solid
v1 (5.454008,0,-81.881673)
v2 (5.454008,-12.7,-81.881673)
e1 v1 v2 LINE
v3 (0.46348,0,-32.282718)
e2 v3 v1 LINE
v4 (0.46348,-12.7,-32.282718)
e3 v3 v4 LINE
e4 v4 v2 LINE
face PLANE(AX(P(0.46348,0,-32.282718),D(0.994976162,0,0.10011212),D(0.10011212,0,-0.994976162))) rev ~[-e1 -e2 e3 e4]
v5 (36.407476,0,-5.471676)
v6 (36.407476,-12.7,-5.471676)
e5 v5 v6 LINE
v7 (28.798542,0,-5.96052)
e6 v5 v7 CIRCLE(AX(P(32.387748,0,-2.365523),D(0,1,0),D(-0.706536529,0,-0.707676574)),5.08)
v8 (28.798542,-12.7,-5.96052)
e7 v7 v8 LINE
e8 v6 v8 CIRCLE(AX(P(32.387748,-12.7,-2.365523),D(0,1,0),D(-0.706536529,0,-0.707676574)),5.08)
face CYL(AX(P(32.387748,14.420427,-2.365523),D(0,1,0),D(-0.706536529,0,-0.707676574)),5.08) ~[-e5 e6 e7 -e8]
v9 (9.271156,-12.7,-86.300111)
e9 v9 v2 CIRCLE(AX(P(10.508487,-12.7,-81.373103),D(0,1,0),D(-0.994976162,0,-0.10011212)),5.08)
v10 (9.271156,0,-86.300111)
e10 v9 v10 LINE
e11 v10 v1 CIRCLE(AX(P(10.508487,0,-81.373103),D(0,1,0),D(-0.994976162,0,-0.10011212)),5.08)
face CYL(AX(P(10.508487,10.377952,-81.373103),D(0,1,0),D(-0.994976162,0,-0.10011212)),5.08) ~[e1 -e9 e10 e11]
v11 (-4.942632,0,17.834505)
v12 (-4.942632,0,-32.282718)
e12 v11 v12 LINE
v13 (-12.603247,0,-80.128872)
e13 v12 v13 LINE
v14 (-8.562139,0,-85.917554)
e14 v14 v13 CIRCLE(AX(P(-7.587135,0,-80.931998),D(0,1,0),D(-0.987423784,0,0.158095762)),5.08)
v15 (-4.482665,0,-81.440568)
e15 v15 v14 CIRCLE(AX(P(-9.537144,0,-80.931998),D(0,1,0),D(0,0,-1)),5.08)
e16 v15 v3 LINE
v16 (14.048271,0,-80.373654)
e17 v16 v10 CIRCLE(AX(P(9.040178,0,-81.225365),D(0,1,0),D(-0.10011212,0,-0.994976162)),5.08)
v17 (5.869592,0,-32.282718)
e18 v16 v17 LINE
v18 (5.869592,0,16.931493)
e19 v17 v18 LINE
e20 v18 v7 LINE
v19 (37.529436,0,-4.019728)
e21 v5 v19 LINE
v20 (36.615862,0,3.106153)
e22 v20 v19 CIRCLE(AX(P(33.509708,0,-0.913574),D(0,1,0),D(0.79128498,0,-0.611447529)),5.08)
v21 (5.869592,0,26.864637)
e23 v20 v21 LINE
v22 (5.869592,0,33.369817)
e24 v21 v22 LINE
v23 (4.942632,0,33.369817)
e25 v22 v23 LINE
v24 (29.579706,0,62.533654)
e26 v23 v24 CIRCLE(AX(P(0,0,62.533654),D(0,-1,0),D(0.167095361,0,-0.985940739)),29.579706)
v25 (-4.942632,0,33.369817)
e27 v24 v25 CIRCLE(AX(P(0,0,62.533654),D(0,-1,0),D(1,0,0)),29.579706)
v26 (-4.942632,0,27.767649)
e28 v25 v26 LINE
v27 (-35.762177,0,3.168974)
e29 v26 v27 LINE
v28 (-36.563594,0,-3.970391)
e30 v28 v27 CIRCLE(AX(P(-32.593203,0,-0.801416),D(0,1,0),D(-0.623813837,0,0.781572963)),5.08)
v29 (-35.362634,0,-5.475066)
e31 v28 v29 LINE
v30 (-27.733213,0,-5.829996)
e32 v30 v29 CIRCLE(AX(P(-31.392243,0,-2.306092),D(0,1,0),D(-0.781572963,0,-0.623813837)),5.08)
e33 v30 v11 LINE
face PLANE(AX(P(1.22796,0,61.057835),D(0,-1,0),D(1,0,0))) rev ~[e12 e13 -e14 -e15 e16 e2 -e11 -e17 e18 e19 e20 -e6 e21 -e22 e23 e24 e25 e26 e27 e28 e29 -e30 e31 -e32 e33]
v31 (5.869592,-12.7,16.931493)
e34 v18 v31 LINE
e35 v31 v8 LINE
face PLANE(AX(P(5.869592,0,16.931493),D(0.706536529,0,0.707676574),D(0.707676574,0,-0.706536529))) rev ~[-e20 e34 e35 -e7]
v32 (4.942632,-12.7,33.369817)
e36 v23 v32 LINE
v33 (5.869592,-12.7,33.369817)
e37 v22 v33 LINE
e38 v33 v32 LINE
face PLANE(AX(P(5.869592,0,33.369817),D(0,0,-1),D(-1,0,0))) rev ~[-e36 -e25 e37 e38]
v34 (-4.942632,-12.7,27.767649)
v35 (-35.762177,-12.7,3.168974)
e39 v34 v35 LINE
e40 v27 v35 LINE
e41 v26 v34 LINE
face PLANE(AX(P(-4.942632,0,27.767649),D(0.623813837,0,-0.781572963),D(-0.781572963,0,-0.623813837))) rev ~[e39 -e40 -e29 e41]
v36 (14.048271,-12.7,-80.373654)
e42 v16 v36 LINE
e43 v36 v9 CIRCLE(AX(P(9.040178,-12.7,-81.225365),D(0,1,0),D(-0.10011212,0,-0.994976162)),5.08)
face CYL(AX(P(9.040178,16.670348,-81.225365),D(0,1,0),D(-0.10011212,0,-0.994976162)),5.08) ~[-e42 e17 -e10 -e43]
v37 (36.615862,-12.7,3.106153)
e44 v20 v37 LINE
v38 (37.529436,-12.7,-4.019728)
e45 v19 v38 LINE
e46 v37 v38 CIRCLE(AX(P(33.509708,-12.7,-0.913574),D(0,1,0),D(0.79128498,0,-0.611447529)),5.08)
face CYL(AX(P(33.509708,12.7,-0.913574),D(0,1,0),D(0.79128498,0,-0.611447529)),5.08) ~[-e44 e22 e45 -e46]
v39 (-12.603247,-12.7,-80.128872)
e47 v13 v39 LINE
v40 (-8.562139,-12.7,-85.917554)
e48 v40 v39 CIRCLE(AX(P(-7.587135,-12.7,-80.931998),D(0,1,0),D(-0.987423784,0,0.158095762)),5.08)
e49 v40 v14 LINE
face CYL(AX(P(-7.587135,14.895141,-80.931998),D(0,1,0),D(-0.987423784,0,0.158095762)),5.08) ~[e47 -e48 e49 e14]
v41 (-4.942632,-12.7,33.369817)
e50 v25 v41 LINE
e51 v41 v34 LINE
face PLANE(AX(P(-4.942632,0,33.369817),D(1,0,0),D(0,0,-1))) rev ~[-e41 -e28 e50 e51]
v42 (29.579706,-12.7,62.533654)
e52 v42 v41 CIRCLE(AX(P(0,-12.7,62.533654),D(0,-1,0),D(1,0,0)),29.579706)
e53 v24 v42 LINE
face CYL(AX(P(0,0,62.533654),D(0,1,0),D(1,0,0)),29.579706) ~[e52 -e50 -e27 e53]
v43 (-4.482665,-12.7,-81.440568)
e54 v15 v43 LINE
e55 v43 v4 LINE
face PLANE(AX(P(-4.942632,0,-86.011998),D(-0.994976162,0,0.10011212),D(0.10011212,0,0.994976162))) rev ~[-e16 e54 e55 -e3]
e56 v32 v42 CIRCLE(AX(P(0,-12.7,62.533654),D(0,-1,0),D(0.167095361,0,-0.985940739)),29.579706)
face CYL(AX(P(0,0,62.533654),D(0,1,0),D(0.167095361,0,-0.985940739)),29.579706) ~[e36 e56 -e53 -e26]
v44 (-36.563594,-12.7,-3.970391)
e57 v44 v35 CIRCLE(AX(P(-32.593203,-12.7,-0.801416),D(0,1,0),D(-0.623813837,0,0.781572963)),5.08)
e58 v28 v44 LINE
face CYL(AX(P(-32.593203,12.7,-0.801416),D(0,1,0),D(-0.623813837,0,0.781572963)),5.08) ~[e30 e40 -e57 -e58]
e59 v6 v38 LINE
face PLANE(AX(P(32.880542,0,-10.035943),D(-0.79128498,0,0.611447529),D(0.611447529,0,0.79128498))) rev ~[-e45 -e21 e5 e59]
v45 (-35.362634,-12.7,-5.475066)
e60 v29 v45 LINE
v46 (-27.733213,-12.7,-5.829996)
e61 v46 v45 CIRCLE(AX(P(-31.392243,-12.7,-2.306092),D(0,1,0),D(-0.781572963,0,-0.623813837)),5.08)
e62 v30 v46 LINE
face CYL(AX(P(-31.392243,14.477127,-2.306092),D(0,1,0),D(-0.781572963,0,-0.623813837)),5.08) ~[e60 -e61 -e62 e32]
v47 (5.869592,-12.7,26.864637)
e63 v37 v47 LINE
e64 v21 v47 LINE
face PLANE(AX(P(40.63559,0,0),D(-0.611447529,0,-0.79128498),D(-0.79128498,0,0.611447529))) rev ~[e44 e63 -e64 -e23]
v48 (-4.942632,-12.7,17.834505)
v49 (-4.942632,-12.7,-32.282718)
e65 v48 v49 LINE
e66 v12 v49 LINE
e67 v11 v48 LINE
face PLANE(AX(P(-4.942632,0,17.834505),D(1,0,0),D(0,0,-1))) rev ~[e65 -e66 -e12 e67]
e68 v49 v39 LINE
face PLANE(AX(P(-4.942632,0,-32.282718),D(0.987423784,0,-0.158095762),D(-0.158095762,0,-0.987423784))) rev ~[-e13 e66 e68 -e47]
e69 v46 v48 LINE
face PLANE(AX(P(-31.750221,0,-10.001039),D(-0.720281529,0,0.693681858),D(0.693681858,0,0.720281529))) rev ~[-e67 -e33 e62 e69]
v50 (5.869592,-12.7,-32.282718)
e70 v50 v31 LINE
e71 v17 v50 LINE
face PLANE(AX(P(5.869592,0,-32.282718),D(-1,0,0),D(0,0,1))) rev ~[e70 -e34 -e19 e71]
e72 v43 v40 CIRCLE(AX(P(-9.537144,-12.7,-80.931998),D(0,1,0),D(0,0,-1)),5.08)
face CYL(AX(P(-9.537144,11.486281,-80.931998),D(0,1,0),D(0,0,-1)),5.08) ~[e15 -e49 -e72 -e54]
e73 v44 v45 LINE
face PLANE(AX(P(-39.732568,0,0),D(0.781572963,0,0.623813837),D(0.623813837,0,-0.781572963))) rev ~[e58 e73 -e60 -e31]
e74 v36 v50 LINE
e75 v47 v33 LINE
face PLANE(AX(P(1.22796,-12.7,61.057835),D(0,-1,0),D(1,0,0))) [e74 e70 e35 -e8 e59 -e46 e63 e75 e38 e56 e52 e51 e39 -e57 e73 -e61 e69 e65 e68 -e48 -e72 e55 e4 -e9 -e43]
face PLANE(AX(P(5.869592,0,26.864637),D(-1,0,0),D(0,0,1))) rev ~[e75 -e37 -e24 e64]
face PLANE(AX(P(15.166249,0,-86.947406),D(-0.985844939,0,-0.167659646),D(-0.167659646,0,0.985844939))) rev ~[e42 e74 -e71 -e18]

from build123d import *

# Parameters (mm, degrees)
F1_DEPTH     = 12.7
F2_T1_DEPTH  = 38.1
F2_T3_DEPTH  = 41.6542533238
F2_T5_DEPTH  = 41.5408544992
F2_T7_DEPTH  = 35.6725625774
F2_T9_DEPTH  = 33.4559034625
F2_T11_DEPTH = 42.4902813585
F2_T13_DEPTH = 46.0406969882


# Not quite as in the source:
# - a fillet or chamfer that OpenCascade refuses, or shapes differently, is made with other operations: its cross-section is extruded or revolved along the edge and cut away or added


with BuildPart() as f1:
    # F0 (on Front) → F1 (new body)
    with BuildSketch(Plane.XZ):
        with BuildLine():
            ThreePointArc((4.9426316758, 33.3698169468), (22.5960240749, 43.4449478875), (29.579706142, 62.5336542726))
            ThreePointArc((29.579706142, 62.5336542726), (-19.0887063851, 85.1296783474), (-4.9426316758, 33.3698169468))
            Line((-4.9426316758, 33.3698169468), (4.9426316758, 33.3698169468))
        make_face()
        with BuildLine():
            Line((4.9426316758, 33.3698169468), (-4.9426316758, 33.3698169468))
            ThreePointArc((-4.9426316758, 33.3698169468), (0, 32.9539481306), (4.9426316758, 33.3698169468))
        make_face()
        with BuildLine():
            ThreePointArc((4.9426316758, 33.3698169468), (0, 32.9539481306), (-4.9426316758, 33.3698169468))
            Line((-4.9426316758, 33.3698169468), (-4.9426316758, 27.7676489204))
            Line((-4.9426316758, 27.7676489204), (-4.9426316758, 17.8345050663))
            Line((-4.9426316758, 17.8345050663), (-4.9426316758, -32.282717526))
            Line((-4.9426316758, -32.282717526), (0.4634799664, -32.282717526))
            Line((0.4634799664, -32.282717526), (5.8695916086, -32.282717526))
            Line((5.8695916086, -32.282717526), (5.8695916086, 16.9314928353))
            Line((5.8695916086, 16.9314928353), (5.8695916086, 26.8646366894))
            Line((5.8695916086, 26.8646366894), (5.8695916086, 33.3698169468))
            Line((5.8695916086, 33.3698169468), (4.9426316758, 33.3698169468))
        make_face()
        Polygon((-4.9426316758, 17.8345050663), (-4.9426316758, 27.7676489204), (-39.732567966, 0), (-31.750221352, -10.0010386527), align=None)
        Polygon((40.6355895102, 0), (5.8695916086, 26.8646366894), (5.8695916086, 16.9314928353), (32.8805417262, -10.0359434636), align=None)
        Polygon((0.4634799664, -32.282717526), (-4.9426316758, -32.282717526), (-13.5451909155, -86.0119983554), (-4.9426316758, -86.0119983554), align=None)
        Polygon((5.8695916086, -32.282717526), (0.4634799664, -32.282717526), (5.8695916086, -86.0119983554), (15.1662486102, -86.9474057324), align=None)
    extrude(amount=F1_DEPTH)

    # F2: fillet of radius 5.08 on 8 edges, made by hand

    # F2_s2 → F2_t1 (cut)
    with BuildSketch(Plane.XZ.offset(-12.7)):
        with BuildLine():
            ThreePointArc((37.5294360638, -4.0197276981), (38.5484672449, -0.2675797032), (36.6158618121, 3.1061534464))
            Line((36.6158618121, 3.1061534464), (40.6355895102, 0))
            Line((40.6355895102, 0), (37.5294360638, -4.0197276981))
        make_face()
        with BuildLine():
            ThreePointArc((-35.7621773131, 3.168974292), (-37.641496387, -0.2347294175), (-36.5635936739, -3.9703906529))
            Line((-36.5635936739, -3.9703906529), (-39.732567966, 0))
            Line((-39.732567966, 0), (-35.7621773131, 3.168974292))
        make_face()
    extrude(amount=F2_T1_DEPTH, mode=Mode.SUBTRACT)

    # F2_s4 → F2_t3 (cut)
    with BuildSketch(Plane.XZ.offset(-14.4771266619)):
        with BuildLine():
            ThreePointArc((-35.3626341248, -5.4750663394), (-31.6283156718, -7.3806038383), (-27.7332133062, -5.8299958835))
            Line((-27.7332133062, -5.8299958835), (-31.750221352, -10.0010386527))
            Line((-31.750221352, -10.0010386527), (-35.3626341248, -5.4750663394))
        make_face()
    extrude(amount=F2_T3_DEPTH, mode=Mode.SUBTRACT)

    # F2_s6 → F2_t5 (cut)
    with BuildSketch(Plane.XZ.offset(-14.4204272496)):
        with BuildLine():
            ThreePointArc((28.7985423047, -5.960520019), (32.7134460909, -7.4350713917), (36.4074755687, -5.4716764688))
            Line((36.4074755687, -5.4716764688), (32.8805417262, -10.0359434636))
            Line((32.8805417262, -10.0359434636), (28.7985423047, -5.960520019))
        make_face()
    extrude(amount=F2_T5_DEPTH, mode=Mode.SUBTRACT)

    # F2_s8 → F2_t7 (cut)
    with BuildSketch(Plane.XZ.offset(-11.4862812887)):
        with BuildLine():
            ThreePointArc((-9.5371441912, -86.0119983554), (-6.1295888664, -84.699619184), (-4.4826652871, -81.4405679254))
            Line((-4.4826652871, -81.4405679254), (-4.9426316758, -86.0119983554))
            Line((-4.9426316758, -86.0119983554), (-9.5371441912, -86.0119983554))
        make_face()
    extrude(amount=F2_T7_DEPTH, mode=Mode.SUBTRACT)

    # F2_s10 → F2_t9 (cut)
    with BuildSketch(Plane.XZ.offset(-10.3779517312)):
        with BuildLine():
            ThreePointArc((5.4540081087, -81.8816725212), (6.9163845644, -84.9652053996), (9.9999174428, -86.4275818554))
            Line((9.9999174428, -86.4275818554), (5.8695916086, -86.0119983554))
            Line((5.8695916086, -86.0119983554), (5.4540081087, -81.8816725212))
        make_face()
    extrude(amount=F2_T9_DEPTH, mode=Mode.SUBTRACT)

    # F2_s12 → F2_t11 (cut)
    with BuildSketch(Plane.XZ.offset(-14.8951406792)):
        with BuildLine():
            ThreePointArc((-12.6032474685, -80.1288718839), (-11.452770586, -84.2279441623), (-7.5871346438, -86.0119983554))
            Line((-7.5871346438, -86.0119983554), (-13.5451909155, -86.0119983554))
            Line((-13.5451909155, -86.0119983554), (-12.6032474685, -80.1288718839))
        make_face()
    extrude(amount=F2_T11_DEPTH, mode=Mode.SUBTRACT)

    # F2_s14 → F2_t13 (cut)
    with BuildSketch(Plane.XZ.offset(-16.6703484941)):
        with BuildLine():
            ThreePointArc((8.5316088631, -86.2798441603), (12.7526164419, -84.6929586624), (14.0482707219, -80.3736542564))
            Line((14.0482707219, -80.3736542564), (15.1662486102, -86.9474057324))
            Line((15.1662486102, -86.9474057324), (8.5316088631, -86.2798441603))
        make_face()
    extrude(amount=F2_T13_DEPTH, mode=Mode.SUBTRACT)


solid = f1.part
